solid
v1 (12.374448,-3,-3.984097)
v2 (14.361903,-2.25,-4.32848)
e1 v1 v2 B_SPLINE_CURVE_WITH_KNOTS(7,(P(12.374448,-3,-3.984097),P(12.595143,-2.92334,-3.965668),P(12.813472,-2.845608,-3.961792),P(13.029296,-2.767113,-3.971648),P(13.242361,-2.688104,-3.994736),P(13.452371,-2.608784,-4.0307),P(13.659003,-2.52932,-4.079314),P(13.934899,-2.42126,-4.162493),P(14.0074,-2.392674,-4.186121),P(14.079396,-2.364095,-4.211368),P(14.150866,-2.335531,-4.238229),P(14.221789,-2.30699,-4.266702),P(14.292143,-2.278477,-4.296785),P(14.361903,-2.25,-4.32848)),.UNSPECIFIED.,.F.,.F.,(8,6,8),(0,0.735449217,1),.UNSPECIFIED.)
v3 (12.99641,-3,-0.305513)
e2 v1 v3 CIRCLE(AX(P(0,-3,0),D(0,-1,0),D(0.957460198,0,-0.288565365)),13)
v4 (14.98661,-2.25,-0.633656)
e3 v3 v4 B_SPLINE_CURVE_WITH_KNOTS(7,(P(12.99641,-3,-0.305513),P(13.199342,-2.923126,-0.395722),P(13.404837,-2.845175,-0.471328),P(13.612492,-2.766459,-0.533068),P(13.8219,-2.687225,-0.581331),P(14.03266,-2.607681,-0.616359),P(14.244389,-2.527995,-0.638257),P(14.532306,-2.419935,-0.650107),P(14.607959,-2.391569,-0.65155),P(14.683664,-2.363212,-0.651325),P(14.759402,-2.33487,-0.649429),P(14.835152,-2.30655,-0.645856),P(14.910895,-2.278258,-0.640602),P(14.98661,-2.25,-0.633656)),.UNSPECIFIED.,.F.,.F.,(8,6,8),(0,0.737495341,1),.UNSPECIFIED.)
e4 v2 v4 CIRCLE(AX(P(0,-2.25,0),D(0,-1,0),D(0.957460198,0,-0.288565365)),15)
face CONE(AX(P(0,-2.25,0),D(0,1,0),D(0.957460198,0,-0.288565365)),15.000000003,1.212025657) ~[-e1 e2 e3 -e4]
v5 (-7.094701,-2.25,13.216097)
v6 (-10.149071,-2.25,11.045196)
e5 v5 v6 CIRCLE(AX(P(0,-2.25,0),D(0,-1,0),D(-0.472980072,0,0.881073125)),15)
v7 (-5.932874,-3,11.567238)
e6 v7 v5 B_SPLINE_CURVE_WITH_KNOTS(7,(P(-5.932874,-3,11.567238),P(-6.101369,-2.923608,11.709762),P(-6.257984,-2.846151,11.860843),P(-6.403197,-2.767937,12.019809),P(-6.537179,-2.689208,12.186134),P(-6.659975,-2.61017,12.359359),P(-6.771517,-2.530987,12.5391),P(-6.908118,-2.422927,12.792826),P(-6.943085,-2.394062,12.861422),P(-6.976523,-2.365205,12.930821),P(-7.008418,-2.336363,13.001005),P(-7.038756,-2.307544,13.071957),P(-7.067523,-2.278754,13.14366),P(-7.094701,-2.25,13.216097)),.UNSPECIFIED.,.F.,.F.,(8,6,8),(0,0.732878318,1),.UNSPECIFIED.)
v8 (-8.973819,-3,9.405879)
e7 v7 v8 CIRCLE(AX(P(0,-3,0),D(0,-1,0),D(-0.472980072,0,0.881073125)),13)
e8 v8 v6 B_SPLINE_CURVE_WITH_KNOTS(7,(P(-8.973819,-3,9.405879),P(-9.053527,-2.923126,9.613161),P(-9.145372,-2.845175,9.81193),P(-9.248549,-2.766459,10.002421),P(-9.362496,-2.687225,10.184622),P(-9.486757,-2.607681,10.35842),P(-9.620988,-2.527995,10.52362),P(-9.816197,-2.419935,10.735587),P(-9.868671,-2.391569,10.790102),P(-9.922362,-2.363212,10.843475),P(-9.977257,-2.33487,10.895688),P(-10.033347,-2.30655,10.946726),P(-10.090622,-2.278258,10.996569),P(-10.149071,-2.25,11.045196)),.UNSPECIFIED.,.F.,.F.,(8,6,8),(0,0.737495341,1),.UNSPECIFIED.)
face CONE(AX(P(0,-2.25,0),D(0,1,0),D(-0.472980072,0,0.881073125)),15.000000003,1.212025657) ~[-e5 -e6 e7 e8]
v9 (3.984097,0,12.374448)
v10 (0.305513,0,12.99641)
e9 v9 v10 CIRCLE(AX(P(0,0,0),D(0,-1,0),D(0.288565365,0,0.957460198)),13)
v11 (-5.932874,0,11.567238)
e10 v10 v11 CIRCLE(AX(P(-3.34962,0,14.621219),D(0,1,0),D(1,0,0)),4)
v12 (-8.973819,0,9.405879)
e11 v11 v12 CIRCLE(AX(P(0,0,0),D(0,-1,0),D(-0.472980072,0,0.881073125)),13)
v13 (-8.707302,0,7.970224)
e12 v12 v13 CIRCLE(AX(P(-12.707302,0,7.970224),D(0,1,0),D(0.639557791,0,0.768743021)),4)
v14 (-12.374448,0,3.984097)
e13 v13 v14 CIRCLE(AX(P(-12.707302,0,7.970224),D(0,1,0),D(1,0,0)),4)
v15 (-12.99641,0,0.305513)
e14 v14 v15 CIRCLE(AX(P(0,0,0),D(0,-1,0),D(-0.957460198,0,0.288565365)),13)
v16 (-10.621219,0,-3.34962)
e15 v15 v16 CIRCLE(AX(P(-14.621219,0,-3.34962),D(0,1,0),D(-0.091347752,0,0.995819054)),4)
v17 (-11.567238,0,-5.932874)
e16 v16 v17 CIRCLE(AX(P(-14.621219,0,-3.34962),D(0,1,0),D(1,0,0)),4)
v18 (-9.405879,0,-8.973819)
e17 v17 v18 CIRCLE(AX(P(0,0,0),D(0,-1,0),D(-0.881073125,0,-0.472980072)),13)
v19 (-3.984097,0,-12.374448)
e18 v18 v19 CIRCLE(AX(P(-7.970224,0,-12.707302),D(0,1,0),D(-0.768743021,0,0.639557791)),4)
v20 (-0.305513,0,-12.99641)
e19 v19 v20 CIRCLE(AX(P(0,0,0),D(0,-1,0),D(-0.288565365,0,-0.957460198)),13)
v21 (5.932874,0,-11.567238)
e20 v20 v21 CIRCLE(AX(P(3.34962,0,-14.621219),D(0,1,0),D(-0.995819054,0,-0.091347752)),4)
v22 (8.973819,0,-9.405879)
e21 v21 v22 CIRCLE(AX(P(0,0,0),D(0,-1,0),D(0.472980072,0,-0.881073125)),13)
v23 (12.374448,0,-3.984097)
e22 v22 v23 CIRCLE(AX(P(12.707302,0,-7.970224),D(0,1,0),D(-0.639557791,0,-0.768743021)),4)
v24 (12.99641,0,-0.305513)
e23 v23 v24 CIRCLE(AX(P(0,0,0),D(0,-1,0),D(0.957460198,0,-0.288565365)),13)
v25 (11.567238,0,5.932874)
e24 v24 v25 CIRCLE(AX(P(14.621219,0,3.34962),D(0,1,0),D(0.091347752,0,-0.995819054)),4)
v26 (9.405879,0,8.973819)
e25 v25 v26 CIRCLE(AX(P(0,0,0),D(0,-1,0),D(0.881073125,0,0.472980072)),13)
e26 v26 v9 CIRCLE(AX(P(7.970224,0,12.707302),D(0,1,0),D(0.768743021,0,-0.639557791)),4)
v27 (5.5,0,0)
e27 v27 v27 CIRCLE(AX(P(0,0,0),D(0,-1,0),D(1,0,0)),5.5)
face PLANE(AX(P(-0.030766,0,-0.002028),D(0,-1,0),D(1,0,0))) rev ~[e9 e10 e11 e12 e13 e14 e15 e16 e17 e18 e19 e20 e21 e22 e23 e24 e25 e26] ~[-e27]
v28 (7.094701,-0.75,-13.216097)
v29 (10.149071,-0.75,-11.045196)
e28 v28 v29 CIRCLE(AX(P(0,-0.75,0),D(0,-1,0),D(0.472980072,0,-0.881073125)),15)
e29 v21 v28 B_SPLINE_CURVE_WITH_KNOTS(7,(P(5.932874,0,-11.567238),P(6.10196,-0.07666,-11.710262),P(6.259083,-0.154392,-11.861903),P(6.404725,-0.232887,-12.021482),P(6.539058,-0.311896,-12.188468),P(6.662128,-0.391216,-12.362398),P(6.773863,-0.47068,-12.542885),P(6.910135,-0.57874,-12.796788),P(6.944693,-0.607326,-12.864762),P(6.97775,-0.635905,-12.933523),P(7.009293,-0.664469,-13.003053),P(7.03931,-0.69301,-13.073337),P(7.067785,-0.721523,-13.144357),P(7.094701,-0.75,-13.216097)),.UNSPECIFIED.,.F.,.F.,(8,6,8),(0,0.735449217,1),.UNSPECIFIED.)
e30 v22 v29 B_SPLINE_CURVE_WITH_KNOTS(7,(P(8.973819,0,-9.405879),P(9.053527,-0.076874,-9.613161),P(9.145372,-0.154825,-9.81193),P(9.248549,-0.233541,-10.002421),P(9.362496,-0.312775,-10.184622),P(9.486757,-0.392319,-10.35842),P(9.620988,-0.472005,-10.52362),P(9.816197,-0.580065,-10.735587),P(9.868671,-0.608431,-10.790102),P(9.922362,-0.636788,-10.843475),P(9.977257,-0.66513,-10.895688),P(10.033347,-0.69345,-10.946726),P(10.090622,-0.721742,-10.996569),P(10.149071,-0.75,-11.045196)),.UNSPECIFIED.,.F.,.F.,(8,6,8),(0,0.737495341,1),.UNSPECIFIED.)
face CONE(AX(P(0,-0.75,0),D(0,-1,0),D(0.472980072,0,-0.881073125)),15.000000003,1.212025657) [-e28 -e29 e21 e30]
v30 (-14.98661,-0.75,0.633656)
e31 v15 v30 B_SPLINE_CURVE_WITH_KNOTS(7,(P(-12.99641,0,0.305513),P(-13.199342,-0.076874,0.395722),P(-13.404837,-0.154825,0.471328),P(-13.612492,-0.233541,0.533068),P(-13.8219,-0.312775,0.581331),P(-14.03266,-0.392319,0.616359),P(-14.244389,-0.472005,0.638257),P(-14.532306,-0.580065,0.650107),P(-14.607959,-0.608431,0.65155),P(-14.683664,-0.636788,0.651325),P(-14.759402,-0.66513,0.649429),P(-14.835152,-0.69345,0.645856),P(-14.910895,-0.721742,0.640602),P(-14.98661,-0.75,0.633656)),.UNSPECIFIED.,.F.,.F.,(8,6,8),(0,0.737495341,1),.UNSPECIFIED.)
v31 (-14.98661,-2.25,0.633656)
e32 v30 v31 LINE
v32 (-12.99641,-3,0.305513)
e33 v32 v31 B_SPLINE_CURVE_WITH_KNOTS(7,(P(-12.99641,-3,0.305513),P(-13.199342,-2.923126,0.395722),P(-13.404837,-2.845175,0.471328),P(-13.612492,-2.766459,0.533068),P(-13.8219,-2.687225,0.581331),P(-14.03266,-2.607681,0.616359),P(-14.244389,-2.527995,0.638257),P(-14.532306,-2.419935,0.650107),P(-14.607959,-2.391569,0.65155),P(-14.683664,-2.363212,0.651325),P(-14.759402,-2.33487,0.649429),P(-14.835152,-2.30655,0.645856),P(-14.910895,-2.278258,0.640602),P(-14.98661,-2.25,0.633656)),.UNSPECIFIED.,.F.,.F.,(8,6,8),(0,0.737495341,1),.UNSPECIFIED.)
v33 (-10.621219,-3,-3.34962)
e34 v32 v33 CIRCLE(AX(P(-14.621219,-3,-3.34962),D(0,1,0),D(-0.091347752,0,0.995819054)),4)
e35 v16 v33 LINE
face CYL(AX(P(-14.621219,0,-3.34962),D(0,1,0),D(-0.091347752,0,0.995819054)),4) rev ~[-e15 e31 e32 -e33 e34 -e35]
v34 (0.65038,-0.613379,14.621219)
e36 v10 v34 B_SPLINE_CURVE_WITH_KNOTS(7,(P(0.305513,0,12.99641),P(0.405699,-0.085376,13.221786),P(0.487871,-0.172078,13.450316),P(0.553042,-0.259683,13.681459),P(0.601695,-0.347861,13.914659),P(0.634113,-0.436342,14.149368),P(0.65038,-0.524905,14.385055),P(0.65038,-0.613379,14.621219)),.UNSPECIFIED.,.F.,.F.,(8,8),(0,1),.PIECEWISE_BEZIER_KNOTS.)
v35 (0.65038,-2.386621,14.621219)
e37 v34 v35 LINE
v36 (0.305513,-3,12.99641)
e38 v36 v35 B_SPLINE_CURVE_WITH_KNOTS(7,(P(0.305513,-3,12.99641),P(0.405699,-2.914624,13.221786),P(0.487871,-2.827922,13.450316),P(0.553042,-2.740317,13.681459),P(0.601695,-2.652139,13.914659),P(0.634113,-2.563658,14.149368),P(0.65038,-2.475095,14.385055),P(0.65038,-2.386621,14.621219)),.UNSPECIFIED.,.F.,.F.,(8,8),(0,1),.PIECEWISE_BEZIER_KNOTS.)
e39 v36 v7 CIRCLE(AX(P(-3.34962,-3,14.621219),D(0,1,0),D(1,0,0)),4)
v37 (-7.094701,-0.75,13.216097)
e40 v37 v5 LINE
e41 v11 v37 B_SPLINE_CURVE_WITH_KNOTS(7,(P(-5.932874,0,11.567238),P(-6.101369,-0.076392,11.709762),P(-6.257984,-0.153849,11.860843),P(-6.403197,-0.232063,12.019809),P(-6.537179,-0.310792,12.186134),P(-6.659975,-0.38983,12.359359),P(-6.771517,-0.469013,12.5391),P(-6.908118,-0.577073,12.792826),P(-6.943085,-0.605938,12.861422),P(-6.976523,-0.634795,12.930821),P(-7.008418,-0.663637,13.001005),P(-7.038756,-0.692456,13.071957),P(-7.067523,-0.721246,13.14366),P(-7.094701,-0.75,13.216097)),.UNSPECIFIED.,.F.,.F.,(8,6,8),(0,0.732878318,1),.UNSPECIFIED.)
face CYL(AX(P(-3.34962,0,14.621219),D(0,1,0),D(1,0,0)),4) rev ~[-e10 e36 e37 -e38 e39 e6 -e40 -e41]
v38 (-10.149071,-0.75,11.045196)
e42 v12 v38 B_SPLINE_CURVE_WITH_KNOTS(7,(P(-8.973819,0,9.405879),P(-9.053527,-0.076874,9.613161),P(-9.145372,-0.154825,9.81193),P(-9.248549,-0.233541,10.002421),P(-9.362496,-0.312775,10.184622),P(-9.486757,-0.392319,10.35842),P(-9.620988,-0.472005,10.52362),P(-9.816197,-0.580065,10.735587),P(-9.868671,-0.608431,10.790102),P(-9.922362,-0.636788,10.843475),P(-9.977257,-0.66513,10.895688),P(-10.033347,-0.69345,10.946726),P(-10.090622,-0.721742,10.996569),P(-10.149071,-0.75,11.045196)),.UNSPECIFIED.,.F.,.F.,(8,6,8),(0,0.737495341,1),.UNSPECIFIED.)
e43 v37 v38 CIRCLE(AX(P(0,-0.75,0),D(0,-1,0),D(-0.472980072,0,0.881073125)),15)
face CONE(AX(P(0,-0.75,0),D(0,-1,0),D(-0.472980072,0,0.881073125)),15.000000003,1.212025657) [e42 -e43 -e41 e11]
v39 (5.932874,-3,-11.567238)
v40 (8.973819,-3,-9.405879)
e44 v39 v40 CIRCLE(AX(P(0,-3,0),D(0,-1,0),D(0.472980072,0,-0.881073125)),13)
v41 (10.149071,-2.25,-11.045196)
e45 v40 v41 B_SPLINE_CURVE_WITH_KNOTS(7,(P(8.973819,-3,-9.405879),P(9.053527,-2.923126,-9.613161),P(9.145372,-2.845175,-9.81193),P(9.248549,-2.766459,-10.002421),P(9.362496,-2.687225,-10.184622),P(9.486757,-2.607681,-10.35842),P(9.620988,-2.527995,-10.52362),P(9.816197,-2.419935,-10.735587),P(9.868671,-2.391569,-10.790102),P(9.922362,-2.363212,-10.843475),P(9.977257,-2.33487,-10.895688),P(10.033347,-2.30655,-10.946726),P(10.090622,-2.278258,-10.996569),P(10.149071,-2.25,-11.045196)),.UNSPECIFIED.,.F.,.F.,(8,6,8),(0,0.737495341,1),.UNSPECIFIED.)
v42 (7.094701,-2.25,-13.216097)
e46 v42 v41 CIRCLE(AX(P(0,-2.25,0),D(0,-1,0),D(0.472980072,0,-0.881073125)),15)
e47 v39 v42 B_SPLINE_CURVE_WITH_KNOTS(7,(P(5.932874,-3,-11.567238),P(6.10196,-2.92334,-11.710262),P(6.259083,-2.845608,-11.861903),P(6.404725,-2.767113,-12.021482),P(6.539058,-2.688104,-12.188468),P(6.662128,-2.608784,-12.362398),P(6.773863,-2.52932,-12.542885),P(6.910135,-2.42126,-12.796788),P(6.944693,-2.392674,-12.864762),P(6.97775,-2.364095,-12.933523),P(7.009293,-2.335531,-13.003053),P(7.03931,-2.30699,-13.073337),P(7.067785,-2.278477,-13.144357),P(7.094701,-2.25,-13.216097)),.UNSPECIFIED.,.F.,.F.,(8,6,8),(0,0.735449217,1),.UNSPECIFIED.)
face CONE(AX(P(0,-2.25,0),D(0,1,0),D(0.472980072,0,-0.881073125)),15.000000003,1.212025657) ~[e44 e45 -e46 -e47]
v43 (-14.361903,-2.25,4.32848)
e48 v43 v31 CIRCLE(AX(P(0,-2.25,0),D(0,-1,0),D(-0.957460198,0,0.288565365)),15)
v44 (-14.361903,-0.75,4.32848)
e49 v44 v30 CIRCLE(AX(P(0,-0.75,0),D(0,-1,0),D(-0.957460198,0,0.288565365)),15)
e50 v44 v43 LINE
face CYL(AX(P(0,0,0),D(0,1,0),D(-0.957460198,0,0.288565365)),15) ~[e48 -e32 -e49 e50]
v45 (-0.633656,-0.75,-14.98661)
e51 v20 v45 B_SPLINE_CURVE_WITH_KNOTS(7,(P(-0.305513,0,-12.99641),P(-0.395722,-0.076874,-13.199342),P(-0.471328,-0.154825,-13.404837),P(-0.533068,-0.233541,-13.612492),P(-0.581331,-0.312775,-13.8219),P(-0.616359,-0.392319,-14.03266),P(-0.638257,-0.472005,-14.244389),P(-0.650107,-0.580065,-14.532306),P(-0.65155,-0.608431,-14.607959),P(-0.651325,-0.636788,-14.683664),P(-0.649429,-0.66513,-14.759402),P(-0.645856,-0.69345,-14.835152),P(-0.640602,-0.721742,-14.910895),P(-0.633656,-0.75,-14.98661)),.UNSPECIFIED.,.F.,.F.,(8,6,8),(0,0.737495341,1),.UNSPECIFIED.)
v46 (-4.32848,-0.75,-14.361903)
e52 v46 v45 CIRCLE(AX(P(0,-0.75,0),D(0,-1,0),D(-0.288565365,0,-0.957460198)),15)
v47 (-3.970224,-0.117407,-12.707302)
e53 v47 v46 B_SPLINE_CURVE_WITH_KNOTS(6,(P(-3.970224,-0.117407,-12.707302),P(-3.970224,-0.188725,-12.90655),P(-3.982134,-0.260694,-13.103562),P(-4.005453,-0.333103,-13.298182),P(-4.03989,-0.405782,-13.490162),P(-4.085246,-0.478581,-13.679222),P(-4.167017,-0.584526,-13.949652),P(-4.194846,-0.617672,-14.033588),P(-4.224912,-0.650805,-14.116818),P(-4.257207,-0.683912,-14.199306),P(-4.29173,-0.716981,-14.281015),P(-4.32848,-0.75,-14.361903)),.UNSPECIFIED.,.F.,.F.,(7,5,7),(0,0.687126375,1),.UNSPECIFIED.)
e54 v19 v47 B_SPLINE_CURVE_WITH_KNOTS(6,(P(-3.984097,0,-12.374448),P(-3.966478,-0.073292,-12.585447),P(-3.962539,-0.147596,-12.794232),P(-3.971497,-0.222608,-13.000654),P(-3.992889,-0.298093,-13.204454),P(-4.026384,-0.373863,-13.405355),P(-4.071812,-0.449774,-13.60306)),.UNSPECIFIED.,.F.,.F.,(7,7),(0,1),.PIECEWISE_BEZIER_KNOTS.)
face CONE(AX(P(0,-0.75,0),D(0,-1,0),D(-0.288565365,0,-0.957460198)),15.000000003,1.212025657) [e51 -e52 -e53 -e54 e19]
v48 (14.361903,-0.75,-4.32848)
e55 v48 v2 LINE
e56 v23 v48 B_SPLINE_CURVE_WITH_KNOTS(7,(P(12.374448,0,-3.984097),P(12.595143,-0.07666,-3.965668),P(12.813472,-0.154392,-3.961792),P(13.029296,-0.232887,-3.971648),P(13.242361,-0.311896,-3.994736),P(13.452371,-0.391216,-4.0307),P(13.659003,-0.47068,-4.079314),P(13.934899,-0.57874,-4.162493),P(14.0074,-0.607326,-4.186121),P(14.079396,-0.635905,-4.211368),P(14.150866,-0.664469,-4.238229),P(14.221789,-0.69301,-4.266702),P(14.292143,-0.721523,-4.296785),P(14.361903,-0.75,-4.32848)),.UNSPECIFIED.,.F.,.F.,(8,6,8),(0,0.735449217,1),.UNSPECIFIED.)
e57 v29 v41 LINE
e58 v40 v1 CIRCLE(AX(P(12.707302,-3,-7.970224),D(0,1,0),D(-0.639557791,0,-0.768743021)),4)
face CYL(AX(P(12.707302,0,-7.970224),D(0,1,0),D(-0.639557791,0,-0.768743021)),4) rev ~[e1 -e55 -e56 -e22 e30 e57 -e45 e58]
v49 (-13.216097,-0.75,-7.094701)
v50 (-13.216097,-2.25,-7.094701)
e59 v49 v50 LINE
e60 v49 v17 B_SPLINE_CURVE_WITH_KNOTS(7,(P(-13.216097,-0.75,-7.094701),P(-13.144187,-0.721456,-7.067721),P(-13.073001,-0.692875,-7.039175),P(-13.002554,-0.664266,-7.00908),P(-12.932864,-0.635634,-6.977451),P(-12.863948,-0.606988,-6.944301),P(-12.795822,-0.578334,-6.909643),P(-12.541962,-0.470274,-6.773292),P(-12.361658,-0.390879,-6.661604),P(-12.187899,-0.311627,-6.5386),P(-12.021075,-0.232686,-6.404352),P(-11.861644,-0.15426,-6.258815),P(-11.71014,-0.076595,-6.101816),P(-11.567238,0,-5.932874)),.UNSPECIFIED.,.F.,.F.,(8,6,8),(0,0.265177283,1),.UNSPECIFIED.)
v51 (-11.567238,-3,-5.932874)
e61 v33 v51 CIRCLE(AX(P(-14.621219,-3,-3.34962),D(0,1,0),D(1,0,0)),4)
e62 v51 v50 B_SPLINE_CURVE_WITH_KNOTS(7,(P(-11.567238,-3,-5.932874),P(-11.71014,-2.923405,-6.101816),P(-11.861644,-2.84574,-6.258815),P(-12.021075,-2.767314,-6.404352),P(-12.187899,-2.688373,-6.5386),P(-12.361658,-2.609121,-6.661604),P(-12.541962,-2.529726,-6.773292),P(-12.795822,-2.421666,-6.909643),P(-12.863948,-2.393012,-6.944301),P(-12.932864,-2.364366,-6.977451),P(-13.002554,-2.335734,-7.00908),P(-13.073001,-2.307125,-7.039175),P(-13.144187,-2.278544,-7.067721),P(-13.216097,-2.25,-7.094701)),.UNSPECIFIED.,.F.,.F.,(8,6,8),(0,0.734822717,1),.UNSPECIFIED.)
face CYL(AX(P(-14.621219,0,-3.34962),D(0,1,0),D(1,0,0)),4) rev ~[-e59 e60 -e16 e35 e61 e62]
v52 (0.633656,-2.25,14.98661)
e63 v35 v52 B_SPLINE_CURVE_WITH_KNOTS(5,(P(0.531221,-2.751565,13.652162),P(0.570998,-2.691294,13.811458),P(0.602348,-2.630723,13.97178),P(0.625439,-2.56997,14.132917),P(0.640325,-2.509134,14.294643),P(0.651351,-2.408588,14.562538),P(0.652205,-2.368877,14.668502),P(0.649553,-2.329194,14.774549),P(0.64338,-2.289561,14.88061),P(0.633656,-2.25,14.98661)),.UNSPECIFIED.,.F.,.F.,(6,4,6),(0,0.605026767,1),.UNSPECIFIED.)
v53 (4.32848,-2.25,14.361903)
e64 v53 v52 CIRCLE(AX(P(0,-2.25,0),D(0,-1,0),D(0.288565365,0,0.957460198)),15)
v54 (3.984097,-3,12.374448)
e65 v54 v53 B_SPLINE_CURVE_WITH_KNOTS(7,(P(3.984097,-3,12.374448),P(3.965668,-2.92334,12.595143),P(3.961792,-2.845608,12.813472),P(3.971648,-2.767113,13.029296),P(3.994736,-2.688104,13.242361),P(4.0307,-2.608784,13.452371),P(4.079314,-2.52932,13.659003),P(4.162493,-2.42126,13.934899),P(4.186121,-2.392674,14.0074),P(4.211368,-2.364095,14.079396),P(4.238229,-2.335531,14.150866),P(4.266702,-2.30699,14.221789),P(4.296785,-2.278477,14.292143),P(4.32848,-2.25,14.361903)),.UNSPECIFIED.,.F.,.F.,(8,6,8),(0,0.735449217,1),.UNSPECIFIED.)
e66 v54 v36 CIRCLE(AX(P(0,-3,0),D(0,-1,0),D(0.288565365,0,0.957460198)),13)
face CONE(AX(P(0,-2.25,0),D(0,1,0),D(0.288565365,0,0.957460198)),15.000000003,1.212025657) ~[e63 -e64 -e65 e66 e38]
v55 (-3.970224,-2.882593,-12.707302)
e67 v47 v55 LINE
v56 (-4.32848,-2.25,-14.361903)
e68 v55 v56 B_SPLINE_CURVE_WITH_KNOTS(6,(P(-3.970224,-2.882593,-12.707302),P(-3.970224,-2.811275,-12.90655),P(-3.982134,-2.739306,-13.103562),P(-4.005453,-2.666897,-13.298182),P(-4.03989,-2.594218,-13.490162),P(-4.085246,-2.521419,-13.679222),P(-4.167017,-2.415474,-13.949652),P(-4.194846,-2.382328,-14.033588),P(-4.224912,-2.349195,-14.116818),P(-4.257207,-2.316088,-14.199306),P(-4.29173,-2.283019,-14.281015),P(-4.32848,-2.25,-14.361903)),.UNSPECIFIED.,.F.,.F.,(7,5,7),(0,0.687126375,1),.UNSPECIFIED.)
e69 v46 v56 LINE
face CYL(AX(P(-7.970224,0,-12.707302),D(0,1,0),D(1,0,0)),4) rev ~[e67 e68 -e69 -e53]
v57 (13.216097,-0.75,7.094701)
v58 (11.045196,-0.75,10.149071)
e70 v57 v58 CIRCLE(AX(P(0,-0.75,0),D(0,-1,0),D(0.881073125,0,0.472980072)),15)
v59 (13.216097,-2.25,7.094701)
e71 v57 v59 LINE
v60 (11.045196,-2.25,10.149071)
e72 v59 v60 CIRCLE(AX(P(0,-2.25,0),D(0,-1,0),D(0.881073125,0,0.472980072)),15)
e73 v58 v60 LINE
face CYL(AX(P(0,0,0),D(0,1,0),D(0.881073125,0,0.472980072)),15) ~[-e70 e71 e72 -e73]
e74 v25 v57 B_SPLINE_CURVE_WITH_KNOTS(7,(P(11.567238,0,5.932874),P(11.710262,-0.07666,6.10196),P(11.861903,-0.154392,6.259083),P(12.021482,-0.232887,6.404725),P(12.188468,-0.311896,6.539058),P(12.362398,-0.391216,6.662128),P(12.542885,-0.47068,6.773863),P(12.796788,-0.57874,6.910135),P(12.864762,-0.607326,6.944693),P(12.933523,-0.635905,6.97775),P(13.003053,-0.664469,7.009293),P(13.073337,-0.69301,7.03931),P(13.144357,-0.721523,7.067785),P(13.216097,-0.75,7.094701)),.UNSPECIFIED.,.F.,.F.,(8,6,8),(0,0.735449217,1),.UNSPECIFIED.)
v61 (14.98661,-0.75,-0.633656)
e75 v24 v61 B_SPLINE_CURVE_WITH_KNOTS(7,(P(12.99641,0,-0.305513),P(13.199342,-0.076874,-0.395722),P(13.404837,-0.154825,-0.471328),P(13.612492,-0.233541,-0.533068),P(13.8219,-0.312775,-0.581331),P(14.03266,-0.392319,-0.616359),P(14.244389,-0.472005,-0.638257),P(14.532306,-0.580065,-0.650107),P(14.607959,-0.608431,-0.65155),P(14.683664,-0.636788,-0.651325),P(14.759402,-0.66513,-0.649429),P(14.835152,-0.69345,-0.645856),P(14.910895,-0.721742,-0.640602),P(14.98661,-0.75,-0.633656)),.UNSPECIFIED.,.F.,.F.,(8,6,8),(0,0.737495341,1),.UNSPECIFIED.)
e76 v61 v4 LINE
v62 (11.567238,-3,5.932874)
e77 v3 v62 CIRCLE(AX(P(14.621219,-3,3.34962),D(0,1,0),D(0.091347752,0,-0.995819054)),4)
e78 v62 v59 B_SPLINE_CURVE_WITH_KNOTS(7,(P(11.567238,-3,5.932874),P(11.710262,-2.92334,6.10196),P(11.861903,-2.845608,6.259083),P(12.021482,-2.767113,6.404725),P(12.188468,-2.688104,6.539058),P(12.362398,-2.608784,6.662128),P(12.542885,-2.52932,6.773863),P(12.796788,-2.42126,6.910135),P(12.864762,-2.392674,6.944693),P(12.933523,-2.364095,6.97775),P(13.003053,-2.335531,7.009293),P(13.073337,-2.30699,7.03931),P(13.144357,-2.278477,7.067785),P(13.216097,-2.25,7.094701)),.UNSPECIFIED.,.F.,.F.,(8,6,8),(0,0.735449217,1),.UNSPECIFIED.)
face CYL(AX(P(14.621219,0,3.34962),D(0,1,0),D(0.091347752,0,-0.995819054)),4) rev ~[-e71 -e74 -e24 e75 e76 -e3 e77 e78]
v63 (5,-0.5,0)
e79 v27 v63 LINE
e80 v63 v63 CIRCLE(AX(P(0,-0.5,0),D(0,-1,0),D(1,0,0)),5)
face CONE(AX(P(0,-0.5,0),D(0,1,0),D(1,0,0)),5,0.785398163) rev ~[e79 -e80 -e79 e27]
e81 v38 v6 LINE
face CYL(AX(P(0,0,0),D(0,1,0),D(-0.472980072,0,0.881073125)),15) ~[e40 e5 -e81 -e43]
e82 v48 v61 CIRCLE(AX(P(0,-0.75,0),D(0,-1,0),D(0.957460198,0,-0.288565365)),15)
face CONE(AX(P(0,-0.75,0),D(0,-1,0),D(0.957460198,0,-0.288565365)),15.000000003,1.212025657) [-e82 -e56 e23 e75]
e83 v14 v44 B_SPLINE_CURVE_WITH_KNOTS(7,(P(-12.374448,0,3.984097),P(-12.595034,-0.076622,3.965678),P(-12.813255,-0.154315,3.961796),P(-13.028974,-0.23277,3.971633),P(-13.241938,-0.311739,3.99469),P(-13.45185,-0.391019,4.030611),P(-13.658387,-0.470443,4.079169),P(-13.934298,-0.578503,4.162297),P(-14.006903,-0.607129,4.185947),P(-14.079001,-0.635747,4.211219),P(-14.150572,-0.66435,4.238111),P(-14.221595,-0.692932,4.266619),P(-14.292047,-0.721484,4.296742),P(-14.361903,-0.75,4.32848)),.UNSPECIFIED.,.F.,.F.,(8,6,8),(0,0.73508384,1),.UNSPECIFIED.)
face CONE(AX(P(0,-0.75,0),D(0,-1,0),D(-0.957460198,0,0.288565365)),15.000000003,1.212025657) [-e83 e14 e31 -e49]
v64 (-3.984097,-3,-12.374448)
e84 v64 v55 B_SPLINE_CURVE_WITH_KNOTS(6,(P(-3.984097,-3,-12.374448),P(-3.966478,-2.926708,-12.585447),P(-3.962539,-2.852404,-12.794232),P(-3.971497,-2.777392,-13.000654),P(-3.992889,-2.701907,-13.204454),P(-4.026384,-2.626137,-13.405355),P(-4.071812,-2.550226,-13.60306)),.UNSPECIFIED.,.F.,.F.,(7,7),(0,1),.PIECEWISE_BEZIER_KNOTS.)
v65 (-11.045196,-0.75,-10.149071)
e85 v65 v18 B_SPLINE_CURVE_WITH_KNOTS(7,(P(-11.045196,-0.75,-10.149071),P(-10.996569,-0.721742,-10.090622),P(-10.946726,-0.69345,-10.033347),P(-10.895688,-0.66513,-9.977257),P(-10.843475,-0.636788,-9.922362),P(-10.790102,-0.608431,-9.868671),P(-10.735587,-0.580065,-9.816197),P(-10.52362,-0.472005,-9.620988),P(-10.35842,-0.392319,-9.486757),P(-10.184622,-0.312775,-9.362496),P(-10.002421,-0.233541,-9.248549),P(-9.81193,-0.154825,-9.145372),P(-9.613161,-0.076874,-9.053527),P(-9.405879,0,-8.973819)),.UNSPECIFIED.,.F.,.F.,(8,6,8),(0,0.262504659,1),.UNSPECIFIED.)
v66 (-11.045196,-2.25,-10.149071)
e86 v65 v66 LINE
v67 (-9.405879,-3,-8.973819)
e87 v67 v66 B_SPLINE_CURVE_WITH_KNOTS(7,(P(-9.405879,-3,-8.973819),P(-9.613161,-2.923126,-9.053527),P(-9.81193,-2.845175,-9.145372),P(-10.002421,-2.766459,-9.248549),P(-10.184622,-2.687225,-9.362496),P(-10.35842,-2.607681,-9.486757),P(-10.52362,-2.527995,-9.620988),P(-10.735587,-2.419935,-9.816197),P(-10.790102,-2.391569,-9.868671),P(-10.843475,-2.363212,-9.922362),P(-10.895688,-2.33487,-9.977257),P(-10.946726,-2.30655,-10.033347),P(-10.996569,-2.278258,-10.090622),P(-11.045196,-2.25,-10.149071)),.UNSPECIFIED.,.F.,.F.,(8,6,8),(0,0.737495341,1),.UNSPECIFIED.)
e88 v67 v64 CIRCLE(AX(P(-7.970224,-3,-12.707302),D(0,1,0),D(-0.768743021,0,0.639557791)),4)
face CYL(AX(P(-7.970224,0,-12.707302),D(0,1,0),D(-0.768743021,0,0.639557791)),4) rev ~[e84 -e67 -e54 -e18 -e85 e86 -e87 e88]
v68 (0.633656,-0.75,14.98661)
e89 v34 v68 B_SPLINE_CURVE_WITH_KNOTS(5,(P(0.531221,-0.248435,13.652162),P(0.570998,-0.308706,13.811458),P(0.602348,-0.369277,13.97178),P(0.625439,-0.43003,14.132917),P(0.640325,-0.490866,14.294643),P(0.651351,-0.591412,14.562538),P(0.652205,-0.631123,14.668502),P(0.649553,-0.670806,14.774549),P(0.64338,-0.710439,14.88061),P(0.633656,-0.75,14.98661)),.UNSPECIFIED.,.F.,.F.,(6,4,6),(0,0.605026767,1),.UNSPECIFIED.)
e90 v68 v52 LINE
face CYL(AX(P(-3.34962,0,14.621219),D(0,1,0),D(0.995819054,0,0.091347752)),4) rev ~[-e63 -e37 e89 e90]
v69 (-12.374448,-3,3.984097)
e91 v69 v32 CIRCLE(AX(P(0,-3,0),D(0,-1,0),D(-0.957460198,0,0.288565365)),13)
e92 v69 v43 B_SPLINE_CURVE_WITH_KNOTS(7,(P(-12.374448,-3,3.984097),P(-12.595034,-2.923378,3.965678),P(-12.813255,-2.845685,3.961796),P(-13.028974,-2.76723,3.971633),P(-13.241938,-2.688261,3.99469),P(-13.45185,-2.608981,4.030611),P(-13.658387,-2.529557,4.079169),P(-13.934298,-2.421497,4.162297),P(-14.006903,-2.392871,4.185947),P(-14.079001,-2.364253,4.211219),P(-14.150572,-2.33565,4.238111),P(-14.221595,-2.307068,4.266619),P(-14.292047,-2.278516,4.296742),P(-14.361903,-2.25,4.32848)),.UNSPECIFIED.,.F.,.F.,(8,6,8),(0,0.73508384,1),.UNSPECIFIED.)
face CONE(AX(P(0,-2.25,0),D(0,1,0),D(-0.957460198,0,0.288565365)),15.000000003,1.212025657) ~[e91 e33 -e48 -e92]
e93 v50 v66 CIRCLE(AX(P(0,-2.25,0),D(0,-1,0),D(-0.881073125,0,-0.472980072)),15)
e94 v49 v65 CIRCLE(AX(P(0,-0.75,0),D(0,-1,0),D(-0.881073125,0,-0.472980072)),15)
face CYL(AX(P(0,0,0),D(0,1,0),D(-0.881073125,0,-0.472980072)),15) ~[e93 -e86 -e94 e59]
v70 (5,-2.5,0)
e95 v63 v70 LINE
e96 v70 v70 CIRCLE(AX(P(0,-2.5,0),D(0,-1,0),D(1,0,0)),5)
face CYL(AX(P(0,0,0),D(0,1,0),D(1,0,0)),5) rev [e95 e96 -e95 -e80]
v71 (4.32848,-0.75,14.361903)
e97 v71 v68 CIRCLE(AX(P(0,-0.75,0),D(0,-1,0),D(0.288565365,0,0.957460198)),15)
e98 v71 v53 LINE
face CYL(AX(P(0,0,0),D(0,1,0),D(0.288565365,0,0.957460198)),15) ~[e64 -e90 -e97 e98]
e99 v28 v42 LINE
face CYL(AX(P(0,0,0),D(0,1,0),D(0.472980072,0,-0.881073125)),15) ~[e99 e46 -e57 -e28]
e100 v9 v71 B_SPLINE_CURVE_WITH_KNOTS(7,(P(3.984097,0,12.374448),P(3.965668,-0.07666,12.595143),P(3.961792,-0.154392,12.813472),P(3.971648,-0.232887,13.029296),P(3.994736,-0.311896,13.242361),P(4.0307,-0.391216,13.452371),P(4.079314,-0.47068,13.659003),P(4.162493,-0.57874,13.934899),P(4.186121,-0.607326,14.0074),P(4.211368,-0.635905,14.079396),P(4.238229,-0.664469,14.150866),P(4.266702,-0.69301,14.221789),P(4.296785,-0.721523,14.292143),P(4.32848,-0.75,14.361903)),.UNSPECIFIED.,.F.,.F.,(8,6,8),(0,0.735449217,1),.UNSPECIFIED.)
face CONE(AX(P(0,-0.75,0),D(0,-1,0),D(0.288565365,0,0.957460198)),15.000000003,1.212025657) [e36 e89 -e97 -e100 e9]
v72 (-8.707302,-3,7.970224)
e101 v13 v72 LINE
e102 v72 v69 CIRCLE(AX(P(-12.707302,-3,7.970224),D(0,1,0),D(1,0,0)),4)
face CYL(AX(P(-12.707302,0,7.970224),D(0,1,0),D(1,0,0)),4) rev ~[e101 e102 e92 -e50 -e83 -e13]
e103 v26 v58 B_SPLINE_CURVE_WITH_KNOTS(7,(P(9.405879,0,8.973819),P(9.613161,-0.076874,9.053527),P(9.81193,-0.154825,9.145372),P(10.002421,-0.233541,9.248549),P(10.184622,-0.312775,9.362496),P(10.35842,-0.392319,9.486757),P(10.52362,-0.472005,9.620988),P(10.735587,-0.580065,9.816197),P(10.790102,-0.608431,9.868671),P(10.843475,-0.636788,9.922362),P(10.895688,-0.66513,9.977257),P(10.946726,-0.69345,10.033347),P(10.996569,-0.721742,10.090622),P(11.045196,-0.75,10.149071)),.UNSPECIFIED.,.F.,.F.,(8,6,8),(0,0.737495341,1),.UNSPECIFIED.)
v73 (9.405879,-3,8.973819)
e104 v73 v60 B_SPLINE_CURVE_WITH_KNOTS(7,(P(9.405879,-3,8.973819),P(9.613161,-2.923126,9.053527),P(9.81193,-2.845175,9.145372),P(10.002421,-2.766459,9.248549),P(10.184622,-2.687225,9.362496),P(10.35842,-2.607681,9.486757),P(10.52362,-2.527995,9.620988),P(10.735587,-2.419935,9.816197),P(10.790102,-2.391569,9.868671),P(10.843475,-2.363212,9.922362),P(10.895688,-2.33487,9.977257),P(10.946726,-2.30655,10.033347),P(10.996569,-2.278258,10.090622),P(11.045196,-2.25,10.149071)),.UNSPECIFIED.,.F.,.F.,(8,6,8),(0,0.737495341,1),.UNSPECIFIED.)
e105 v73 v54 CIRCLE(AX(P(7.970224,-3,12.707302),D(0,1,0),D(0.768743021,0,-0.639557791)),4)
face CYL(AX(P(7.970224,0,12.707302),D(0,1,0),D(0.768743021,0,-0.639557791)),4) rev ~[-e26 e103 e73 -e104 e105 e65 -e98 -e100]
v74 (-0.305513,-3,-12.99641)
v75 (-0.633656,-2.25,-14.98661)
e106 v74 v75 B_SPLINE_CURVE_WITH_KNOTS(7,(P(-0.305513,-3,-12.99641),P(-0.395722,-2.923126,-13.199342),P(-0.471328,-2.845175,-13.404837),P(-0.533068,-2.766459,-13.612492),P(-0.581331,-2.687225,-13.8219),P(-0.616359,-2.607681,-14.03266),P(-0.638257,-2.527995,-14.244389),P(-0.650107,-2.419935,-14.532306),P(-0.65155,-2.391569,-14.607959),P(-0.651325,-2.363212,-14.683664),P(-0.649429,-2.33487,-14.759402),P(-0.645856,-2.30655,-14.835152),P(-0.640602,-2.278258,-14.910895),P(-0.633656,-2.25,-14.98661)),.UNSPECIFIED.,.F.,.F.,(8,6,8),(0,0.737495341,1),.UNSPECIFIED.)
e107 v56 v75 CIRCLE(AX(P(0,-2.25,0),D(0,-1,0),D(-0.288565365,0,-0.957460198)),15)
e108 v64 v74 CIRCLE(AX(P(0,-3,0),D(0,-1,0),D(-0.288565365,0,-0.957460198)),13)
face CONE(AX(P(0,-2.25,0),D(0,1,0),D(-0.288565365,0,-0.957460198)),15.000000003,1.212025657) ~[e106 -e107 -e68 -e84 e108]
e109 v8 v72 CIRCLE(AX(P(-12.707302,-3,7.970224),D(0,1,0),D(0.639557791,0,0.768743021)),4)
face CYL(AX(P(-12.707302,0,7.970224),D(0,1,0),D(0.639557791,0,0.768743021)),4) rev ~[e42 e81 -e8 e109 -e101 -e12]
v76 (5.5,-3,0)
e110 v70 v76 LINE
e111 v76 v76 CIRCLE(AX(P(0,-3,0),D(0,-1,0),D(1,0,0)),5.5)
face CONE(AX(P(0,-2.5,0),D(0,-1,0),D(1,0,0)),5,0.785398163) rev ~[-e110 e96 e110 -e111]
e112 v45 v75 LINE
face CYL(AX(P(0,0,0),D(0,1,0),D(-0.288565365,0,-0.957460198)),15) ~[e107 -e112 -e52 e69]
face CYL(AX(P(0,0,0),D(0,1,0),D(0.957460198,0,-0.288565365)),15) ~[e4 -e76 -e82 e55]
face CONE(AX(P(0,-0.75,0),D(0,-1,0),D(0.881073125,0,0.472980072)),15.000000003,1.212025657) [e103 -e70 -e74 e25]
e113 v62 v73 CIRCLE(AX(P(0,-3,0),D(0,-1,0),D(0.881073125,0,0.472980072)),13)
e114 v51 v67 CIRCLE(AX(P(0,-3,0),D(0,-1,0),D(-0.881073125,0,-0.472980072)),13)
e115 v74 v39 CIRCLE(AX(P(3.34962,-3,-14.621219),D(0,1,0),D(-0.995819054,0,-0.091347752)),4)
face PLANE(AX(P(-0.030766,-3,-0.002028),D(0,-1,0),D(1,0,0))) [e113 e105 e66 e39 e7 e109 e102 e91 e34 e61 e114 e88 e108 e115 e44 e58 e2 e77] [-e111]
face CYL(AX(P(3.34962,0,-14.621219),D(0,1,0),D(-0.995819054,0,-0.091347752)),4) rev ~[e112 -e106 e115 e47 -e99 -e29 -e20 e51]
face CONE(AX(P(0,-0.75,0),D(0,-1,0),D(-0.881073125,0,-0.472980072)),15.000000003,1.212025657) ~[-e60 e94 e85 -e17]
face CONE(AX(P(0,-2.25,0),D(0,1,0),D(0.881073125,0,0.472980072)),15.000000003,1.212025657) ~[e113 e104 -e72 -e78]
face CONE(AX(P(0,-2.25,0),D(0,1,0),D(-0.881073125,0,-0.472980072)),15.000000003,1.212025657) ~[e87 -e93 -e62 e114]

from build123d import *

# Parameters (mm, degrees)
F0_R         = 5
F1_DEPTH     = 3
F2_C1_SIZE2  = 0.75
F2_C1_SIZE   = 2
F2_C2_SIZE2  = 0.75
F2_C2_SIZE   = 2
F2_C3_SIZE2  = 0.75
F2_C3_SIZE   = 2
F2_C4_SIZE2  = 0.75
F2_C4_SIZE   = 2
F2_C5_SIZE2  = 0.75
F2_C5_SIZE   = 2
F2_C6_SIZE2  = 0.75
F2_C6_SIZE   = 2
F2_C7_SIZE2  = 0.75
F2_C7_SIZE   = 2
F2_C8_SIZE2  = 0.75
F2_C8_SIZE   = 2
F2_C9_SIZE2  = 2
F2_C9_SIZE   = 0.75
F2_C10_SIZE2 = 0.75
F2_C10_SIZE  = 2
F2_C11_SIZE2 = 0.75
F2_C11_SIZE  = 2
F2_C12_SIZE2 = 0.75
F2_C12_SIZE  = 2
F2_C13_SIZE2 = 0.75
F2_C13_SIZE  = 2
F2_C14_SIZE2 = 0.75
F2_C14_SIZE  = 2
F2_C15_SIZE2 = 0.75
F2_C15_SIZE  = 2
F2_C16_SIZE2 = 0.75
F2_C16_SIZE  = 2
F4_SIZE      = 0.5


# Not quite as in the source:
# - two fillets or chamfers of one size are made in one step


with BuildPart() as f1:
    # F0 (on Front) → F1 (new body)
    with BuildSketch(Plane.XZ):
        with BuildLine():
            ThreePointArc((14.98661002, -0.6336561441), (10.7222272749, 2.4563880526), (13.2160968729, 7.0947010823))
            ThreePointArc((13.2160968729, 7.0947010823), (12.2264008787, 8.6899437025), (11.0451961285, 10.1490710157))
            ThreePointArc((11.0451961285, 10.1490710157), (5.8448309663, 9.3186882647), (4.3284804738, 14.3619029654))
            ThreePointArc((4.3284804738, 14.3619029654), (2.5006528507, 14.790089091), (0.6336561441, 14.98661002))
            ThreePointArc((0.6336561441, 14.98661002), (0.6461967949, 14.8041057756), (0.6503799283, 14.6212190113))
            ThreePointArc((0.6503799283, 14.6212190113), (-2.6355906754, 10.6854646971), (-7.0947010823, 13.2160968729))
            ThreePointArc((-7.0947010823, 13.2160968729), (-8.6899437025, 12.2264008787), (-10.1490710157, 11.0451961285))
            ThreePointArc((-10.1490710157, 11.0451961285), (-9.0856364951, 9.6683222969), (-8.7073021792, 7.970224045))
            ThreePointArc((-8.7073021792, 7.970224045), (-10.5414770644, 4.6073084094), (-14.3619029654, 4.3284804738))
            ThreePointArc((-14.3619029654, 4.3284804738), (-14.790089091, 2.5006528507), (-14.98661002, 0.6336561441))
            ThreePointArc((-14.98661002, 0.6336561441), (-11.9250702797, -0.3948303977), (-10.6212190113, -3.3496200717))
            ThreePointArc((-10.6212190113, -3.3496200717), (-11.3333254186, -5.6277236082), (-13.2160968729, -7.0947010823))
            ThreePointArc((-13.2160968729, -7.0947010823), (-12.2264008787, -8.6899437025), (-11.0451961285, -10.1490710157))
            ThreePointArc((-11.0451961285, -10.1490710157), (-6.6100564697, -8.9456610257), (-3.970224045, -12.7073021792))
            ThreePointArc((-3.970224045, -12.7073021792), (-4.060813969, -13.5537730042), (-4.3284804738, -14.3619029654))
            ThreePointArc((-4.3284804738, -14.3619029654), (-2.5006528507, -14.790089091), (-0.6336561441, -14.98661002))
            ThreePointArc((-0.6336561441, -14.98661002), (2.4563880526, -10.7222272749), (7.0947010823, -13.2160968729))
            ThreePointArc((7.0947010823, -13.2160968729), (8.6899437025, -12.2264008787), (10.1490710157, -11.0451961285))
            ThreePointArc((10.1490710157, -11.0451961285), (9.3186882647, -5.8448309663), (14.3619029654, -4.3284804738))
            ThreePointArc((14.3619029654, -4.3284804738), (14.790089091, -2.5006528507), (14.98661002, -0.6336561441))
        make_face()
        Circle(F0_R, mode=Mode.SUBTRACT)
    extrude(amount=F1_DEPTH)

    # F2: chamfer of 2 x 0.75 on 16 edges, made by hand

    # F2_c1
    f2_c1_edges = [f1.edges().sort_by_distance(p)[0] for p in [
        (8.6899437025, -3, -12.2264008787),
    ]]
    f2_c1_side = f1.faces().sort_by_distance((8.6812537588, -3, -12.2141744779))[0]
    chamfer(f2_c1_edges, length=F2_C1_SIZE, length2=F2_C1_SIZE2, reference=f2_c1_side)

    # F2_c2
    f2_c2_edges = [f1.edges().sort_by_distance(p)[0] for p in [
        (14.790089091, -3, -2.5006528507),
    ]]
    f2_c2_side = f1.faces().sort_by_distance((14.7752990019, -3, -2.4981521978))[0]
    chamfer(f2_c2_edges, length=F2_C2_SIZE, length2=F2_C2_SIZE2, reference=f2_c2_side)

    # F2_c3
    f2_c3_edges = [f1.edges().sort_by_distance(p)[0] for p in [
        (12.2264008787, -3, 8.6899437025),
    ]]
    f2_c3_side = f1.faces().sort_by_distance((12.2141744779, -3, 8.6812537588))[0]
    chamfer(f2_c3_edges, length=F2_C3_SIZE, length2=F2_C3_SIZE2, reference=f2_c3_side)

    # F2_c4
    f2_c4_edges = [f1.edges().sort_by_distance(p)[0] for p in [
        (2.5006528507, -3, 14.790089091),
    ]]
    f2_c4_side = f1.faces().sort_by_distance((2.4981521978, -3, 14.7752990019))[0]
    chamfer(f2_c4_edges, length=F2_C4_SIZE, length2=F2_C4_SIZE2, reference=f2_c4_side)

    # F2_c5
    f2_c5_edges = [f1.edges().sort_by_distance(p)[0] for p in [
        (-8.6899437025, -3, 12.2264008787),
    ]]
    f2_c5_side = f1.faces().sort_by_distance((-8.6812537588, -3, 12.2141744779))[0]
    chamfer(f2_c5_edges, length=F2_C5_SIZE, length2=F2_C5_SIZE2, reference=f2_c5_side)

    # F2_c6
    f2_c6_edges = [f1.edges().sort_by_distance(p)[0] for p in [
        (-14.790089091, -3, 2.5006528507),
    ]]
    f2_c6_side = f1.faces().sort_by_distance((-14.7752990019, -3, 2.4981521978))[0]
    chamfer(f2_c6_edges, length=F2_C6_SIZE, length2=F2_C6_SIZE2, reference=f2_c6_side)

    # F2_c7
    f2_c7_edges = [f1.edges().sort_by_distance(p)[0] for p in [
        (-12.2264008787, -3, -8.6899437025),
    ]]
    f2_c7_side = f1.faces().sort_by_distance((-12.2141744779, -3, -8.6812537588))[0]
    chamfer(f2_c7_edges, length=F2_C7_SIZE, length2=F2_C7_SIZE2, reference=f2_c7_side)

    # F2_c8
    f2_c8_edges = [f1.edges().sort_by_distance(p)[0] for p in [
        (-2.5006528507, -3, -14.790089091),
    ]]
    f2_c8_side = f1.faces().sort_by_distance((-2.4981521978, -3, -14.7752990019))[0]
    chamfer(f2_c8_edges, length=F2_C8_SIZE, length2=F2_C8_SIZE2, reference=f2_c8_side)

    # F2_c9
    f2_c9_edges = [f1.edges().sort_by_distance(p)[0] for p in [
        (-12.2264008787, 0, -8.6899437025),
    ]]
    f2_c9_side = f1.faces().sort_by_distance((-12.2264008787, -0.015, -8.6899437025))[0]
    chamfer(f2_c9_edges, length=F2_C9_SIZE, length2=F2_C9_SIZE2, reference=f2_c9_side)

    # F2_c10
    f2_c10_edges = [f1.edges().sort_by_distance(p)[0] for p in [
        (-14.790089091, 0, 2.5006528507),
    ]]
    f2_c10_side = f1.faces().sort_by_distance((-14.7752990019, 0, 2.4981521978))[0]
    chamfer(f2_c10_edges, length=F2_C10_SIZE, length2=F2_C10_SIZE2, reference=f2_c10_side)

    # F2_c11
    f2_c11_edges = [f1.edges().sort_by_distance(p)[0] for p in [
        (-8.6899437025, 0, 12.2264008787),
    ]]
    f2_c11_side = f1.faces().sort_by_distance((-8.6812537588, 0, 12.2141744779))[0]
    chamfer(f2_c11_edges, length=F2_C11_SIZE, length2=F2_C11_SIZE2, reference=f2_c11_side)

    # F2_c12
    f2_c12_edges = [f1.edges().sort_by_distance(p)[0] for p in [
        (2.5006528507, 0, 14.790089091),
    ]]
    f2_c12_side = f1.faces().sort_by_distance((2.4981521978, 0, 14.7752990019))[0]
    chamfer(f2_c12_edges, length=F2_C12_SIZE, length2=F2_C12_SIZE2, reference=f2_c12_side)

    # F2_c13
    f2_c13_edges = [f1.edges().sort_by_distance(p)[0] for p in [
        (12.2264008787, 0, 8.6899437025),
    ]]
    f2_c13_side = f1.faces().sort_by_distance((12.2141744779, 0, 8.6812537588))[0]
    chamfer(f2_c13_edges, length=F2_C13_SIZE, length2=F2_C13_SIZE2, reference=f2_c13_side)

    # F2_c14
    f2_c14_edges = [f1.edges().sort_by_distance(p)[0] for p in [
        (14.790089091, 0, -2.5006528507),
    ]]
    f2_c14_side = f1.faces().sort_by_distance((14.7752990019, 0, -2.4981521978))[0]
    chamfer(f2_c14_edges, length=F2_C14_SIZE, length2=F2_C14_SIZE2, reference=f2_c14_side)

    # F2_c15
    f2_c15_edges = [f1.edges().sort_by_distance(p)[0] for p in [
        (8.6899437025, 0, -12.2264008787),
    ]]
    f2_c15_side = f1.faces().sort_by_distance((8.6812537588, 0, -12.2141744779))[0]
    chamfer(f2_c15_edges, length=F2_C15_SIZE, length2=F2_C15_SIZE2, reference=f2_c15_side)

    # F2_c16
    f2_c16_edges = [f1.edges().sort_by_distance(p)[0] for p in [
        (-2.5006528507, 0, -14.790089091),
    ]]
    f2_c16_side = f1.faces().sort_by_distance((-2.4981521978, 0, -14.7752990019))[0]
    chamfer(f2_c16_edges, length=F2_C16_SIZE, length2=F2_C16_SIZE2, reference=f2_c16_side)

    # F4
    f4_edges = [f1.edges().sort_by_distance(p)[0] for p in [
        (-5, -3, 0),
        (-5, 0, 0),
    ]]
    chamfer(f4_edges, length=F4_SIZE)


solid = f1.part
